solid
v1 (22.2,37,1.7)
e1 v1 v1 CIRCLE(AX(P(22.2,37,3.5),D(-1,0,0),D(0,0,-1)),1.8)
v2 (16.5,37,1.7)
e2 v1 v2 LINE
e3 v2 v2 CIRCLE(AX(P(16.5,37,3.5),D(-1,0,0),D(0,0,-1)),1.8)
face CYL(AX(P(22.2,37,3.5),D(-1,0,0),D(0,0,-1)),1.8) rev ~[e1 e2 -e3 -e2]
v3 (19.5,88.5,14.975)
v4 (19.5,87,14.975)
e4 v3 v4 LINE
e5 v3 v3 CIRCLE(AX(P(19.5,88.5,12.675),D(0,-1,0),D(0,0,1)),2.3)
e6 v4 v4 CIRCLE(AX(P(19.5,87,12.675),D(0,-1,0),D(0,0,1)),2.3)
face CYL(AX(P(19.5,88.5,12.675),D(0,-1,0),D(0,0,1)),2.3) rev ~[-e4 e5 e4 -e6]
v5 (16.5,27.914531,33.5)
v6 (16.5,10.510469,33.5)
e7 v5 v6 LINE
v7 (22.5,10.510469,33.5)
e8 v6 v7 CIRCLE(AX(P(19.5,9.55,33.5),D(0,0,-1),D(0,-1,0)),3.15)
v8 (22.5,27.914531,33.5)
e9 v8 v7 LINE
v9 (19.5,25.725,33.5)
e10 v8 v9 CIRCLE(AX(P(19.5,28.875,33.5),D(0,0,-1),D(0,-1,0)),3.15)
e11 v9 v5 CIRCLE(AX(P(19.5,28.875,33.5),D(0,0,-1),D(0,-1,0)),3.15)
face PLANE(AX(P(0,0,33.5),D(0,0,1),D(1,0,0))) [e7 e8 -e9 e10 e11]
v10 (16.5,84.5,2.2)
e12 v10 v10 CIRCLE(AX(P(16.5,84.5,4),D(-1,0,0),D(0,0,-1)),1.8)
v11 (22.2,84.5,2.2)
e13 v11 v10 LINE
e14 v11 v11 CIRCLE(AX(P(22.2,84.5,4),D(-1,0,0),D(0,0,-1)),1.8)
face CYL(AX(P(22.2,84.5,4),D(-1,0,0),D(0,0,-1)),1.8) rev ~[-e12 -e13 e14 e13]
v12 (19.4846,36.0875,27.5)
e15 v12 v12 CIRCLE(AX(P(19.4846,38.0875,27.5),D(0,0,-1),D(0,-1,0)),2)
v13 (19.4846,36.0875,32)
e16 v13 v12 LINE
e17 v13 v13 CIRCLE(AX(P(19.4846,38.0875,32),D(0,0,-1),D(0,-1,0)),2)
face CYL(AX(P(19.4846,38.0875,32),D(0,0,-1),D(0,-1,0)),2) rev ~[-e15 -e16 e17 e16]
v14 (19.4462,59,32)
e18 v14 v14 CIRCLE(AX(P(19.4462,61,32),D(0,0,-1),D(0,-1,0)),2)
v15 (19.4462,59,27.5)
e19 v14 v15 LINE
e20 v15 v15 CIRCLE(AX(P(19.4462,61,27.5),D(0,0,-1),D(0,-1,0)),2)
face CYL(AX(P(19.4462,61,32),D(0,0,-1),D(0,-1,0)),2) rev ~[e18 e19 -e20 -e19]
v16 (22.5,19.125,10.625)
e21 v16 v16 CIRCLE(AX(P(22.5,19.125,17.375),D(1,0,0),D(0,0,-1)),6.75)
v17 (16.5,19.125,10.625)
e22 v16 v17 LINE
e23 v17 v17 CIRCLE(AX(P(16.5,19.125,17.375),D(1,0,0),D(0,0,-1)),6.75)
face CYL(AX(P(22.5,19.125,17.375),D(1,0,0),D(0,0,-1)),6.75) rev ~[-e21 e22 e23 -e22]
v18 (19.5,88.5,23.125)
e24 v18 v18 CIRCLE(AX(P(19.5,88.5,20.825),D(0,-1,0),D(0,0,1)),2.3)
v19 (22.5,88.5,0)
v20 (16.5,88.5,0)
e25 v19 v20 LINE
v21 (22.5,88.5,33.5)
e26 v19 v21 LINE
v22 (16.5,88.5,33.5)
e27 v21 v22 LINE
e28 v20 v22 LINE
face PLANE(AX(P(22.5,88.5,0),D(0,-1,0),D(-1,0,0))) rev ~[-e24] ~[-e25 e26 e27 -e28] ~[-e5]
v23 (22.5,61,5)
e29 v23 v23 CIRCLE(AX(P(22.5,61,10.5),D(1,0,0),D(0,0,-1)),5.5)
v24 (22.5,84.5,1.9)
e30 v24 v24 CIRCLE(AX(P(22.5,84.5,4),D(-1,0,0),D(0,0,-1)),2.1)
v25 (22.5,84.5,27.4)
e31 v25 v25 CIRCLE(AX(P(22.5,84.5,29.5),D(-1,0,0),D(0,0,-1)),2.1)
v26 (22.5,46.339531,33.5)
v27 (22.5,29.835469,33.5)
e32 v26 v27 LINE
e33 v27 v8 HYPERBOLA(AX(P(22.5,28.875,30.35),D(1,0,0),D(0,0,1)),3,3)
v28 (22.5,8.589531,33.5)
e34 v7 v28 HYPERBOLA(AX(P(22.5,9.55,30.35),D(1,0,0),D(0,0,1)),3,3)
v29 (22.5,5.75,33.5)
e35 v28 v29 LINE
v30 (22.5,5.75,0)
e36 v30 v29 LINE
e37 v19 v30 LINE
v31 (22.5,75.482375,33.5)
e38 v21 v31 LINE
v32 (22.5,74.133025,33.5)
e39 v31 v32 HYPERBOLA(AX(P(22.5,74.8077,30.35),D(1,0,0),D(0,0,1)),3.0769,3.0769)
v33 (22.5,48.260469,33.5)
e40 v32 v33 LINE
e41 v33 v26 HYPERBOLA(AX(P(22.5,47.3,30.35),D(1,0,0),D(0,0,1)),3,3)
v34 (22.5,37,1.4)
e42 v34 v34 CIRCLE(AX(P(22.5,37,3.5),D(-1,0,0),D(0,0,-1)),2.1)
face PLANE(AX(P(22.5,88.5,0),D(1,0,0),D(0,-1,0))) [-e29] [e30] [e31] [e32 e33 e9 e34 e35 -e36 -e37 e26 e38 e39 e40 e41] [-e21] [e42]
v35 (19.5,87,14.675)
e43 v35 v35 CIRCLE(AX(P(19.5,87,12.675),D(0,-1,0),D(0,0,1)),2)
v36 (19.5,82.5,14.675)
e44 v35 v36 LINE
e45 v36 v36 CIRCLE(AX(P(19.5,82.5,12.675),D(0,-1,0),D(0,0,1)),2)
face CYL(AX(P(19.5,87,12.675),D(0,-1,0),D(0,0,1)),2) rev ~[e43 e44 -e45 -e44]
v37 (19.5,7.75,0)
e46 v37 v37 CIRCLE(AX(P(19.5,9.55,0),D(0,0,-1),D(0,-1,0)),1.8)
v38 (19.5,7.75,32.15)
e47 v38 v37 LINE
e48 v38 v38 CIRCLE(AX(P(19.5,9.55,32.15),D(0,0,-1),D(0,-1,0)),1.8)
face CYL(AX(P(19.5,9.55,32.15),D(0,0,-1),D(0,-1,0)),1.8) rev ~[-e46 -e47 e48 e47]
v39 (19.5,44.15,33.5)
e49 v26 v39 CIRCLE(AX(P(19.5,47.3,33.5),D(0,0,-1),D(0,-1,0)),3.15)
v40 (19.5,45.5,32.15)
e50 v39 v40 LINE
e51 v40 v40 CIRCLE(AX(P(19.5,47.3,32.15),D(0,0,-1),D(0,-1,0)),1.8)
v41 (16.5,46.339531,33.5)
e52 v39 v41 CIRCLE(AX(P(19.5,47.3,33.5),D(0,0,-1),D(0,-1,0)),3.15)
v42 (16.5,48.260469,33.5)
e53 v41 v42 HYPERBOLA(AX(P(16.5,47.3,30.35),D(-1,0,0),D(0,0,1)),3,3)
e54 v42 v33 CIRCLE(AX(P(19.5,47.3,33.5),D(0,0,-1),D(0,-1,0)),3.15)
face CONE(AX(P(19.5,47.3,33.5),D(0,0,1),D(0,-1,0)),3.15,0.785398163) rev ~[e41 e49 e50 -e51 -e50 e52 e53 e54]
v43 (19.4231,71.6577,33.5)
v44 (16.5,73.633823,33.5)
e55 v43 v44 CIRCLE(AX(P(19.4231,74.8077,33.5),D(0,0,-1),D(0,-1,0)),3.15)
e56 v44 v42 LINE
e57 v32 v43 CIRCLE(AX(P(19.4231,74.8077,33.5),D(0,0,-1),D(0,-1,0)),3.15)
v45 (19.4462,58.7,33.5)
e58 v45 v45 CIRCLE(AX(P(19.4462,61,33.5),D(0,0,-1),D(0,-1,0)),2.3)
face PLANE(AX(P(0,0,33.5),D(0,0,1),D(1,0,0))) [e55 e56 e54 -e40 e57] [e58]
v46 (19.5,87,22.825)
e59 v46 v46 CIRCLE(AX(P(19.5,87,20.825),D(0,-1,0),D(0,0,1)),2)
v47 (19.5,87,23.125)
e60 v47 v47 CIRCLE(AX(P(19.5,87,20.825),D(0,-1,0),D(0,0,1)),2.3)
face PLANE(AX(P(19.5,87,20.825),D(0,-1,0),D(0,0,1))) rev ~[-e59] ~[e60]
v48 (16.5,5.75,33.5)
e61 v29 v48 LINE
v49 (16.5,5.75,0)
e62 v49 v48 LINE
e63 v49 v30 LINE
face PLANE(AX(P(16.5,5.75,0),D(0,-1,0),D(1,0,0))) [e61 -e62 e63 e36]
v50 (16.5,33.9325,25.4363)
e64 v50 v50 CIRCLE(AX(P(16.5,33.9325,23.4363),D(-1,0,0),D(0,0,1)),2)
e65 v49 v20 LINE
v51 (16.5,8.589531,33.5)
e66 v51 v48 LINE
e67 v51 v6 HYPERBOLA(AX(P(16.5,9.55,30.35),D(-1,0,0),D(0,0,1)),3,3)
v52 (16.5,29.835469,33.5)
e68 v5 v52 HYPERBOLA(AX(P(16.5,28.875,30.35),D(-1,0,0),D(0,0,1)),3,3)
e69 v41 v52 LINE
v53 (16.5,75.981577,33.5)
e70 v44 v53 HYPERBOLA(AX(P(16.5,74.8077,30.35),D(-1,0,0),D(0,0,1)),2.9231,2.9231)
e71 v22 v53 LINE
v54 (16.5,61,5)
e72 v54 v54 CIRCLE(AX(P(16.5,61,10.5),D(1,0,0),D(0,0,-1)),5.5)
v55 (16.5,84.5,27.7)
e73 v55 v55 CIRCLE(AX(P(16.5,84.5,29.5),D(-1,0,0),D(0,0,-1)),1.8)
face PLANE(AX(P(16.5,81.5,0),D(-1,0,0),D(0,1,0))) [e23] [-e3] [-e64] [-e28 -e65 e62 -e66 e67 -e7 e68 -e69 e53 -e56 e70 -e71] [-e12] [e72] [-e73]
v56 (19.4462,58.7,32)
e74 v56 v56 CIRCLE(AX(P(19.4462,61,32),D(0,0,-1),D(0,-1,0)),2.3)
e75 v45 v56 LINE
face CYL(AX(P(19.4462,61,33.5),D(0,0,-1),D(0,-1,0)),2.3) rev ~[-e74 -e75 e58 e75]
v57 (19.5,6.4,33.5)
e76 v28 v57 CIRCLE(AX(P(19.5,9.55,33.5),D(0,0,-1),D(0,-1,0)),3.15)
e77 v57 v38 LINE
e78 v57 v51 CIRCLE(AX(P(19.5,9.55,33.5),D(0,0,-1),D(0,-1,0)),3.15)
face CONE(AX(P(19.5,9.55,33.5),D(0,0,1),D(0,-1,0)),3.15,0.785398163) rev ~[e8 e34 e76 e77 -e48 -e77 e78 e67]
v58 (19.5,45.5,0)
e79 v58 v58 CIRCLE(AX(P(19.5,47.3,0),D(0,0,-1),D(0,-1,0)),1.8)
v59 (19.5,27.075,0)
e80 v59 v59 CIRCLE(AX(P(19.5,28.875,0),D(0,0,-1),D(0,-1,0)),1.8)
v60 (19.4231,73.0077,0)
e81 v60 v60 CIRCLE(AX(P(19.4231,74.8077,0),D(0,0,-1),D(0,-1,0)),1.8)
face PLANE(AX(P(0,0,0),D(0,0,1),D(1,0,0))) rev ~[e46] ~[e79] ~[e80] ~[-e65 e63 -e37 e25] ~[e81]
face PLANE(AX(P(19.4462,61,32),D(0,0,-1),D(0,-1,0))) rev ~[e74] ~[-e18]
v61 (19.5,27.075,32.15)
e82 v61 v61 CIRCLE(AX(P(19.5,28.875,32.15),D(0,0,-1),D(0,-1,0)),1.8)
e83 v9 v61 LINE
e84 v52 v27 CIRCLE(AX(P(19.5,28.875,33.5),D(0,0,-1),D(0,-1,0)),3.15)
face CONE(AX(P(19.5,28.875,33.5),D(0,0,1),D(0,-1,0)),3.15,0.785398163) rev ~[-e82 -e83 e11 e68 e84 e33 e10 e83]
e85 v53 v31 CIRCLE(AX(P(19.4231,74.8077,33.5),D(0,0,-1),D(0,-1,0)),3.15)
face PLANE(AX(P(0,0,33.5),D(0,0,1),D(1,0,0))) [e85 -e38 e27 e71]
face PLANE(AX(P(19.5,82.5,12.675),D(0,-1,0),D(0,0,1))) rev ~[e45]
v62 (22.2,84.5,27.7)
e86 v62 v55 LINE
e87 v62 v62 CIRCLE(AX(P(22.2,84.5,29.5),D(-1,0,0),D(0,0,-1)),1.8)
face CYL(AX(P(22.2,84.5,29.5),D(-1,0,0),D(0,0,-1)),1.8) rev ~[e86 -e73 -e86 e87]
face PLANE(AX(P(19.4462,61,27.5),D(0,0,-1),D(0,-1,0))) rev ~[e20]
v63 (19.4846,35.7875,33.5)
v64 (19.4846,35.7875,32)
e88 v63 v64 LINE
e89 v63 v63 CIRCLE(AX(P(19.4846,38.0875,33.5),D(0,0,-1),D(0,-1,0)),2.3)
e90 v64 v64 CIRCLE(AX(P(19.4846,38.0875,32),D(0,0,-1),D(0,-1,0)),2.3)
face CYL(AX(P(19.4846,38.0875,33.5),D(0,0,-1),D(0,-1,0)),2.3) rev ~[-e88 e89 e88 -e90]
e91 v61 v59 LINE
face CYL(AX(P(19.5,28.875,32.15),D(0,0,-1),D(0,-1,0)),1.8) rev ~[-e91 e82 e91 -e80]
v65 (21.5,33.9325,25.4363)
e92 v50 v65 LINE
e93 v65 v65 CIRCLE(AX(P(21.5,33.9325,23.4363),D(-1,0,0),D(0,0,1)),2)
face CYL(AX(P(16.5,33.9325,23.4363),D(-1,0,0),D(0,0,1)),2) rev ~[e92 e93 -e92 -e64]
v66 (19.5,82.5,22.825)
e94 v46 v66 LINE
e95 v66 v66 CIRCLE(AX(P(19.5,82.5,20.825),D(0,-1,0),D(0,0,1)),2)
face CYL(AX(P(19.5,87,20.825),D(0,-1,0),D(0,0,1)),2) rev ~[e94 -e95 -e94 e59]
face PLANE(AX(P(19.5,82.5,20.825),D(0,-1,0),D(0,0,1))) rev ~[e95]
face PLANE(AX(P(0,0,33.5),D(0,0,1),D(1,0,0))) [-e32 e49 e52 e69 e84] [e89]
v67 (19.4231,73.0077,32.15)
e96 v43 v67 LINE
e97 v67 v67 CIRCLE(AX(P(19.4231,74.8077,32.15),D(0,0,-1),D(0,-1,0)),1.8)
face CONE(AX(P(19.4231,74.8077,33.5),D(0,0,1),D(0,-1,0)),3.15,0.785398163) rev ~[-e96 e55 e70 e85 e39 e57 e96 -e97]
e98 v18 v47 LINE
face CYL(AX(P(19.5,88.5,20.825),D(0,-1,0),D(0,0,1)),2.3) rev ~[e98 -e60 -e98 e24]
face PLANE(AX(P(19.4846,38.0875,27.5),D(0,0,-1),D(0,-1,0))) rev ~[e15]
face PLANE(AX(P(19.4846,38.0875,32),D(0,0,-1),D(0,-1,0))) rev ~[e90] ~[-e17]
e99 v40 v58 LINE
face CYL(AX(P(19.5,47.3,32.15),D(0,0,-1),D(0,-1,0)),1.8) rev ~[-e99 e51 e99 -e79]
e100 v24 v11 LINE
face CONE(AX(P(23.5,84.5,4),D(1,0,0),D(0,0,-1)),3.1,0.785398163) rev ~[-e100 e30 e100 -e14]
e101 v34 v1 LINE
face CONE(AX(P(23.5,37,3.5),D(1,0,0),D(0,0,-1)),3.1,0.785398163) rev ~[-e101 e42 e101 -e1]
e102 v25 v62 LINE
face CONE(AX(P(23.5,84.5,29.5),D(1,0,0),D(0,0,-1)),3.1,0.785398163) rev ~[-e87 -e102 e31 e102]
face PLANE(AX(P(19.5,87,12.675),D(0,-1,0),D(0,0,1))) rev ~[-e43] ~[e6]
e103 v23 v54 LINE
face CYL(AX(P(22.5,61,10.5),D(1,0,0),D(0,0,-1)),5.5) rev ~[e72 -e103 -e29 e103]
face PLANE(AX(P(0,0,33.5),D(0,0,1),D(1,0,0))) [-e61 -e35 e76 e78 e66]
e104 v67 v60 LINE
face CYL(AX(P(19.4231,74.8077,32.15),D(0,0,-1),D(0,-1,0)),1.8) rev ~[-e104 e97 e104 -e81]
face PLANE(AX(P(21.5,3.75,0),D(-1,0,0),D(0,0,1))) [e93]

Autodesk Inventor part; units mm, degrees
ref_plane "YZ Plane" through (0, 0, 0) normal (1, 0, 0) x (0, 1, 0)
ref_plane "XZ Plane" through (0, 0, 0) normal (0, 1, 0) x (-1, 0, 0)
ref_plane "Work Plane1" through (0, 0, 0) normal (0, 0, 1) x (1, 0, 0)
sketch "Sketch1" plane through (0, 0, 0) normal (0, 0, 1) x (1, 0, 0)
  line L0 (23.5, 88.5) -> (-23.5, 88.5) projected
  line L1 (-23.5, 88.5) -> (-23.5, 36.5) projected
  line L2 (-26.5, 33.5) -> (-89, 33.5) projected
  line L3 (-89, 33.5) -> (-89, -72.5) projected
  line L4 (-89, -72.5) -> (-77, -72.5) projected
  line L5 (-74, -75.5) -> (-74, -93.5) projected
  line L6 (-74, -93.5) -> (74, -93.5) projected
  line L7 (74, -93.5) -> (74, -75.5) projected
  line L8 (77, -72.5) -> (89, -72.5) projected
  line L9 (89, -72.5) -> (89, 33.5) projected
  line L10 (89, 33.5) -> (26.5, 33.5) projected
  line L11 (23.5, 36.5) -> (23.5, 88.5) projected
  line L12 (-4.5, 81.5) -> (-4.5, 36.5) projected
  line L13 (-7.5, 33.5) -> (-13.5, 33.5) projected
  line L14 (-16.5, 36.5) -> (-16.5, 81.5) projected
  line L15 (7.5, 84.5) -> (13.5, 84.5) projected
  line L16 (16.5, 81.5) -> (16.5, 36.5) projected
  line L17 (13.5, 33.5) -> (7.5, 33.5) projected
  line L18 (4.5, 36.5) -> (4.5, 81.5) projected
  line L19 (-13.5, 84.5) -> (-7.5, 84.5) projected
  line L20 (16.5, 88.5) -> (22.5, 88.5)
  line L21 (22.5, 88.5) -> (22.5, 3.75)
  line L22 (22.5, 3.75) -> (16.5, 3.75)
  line L23 (16.5, 3.75) -> (16.5, 88.5)
  line L24 (59.9, 4.75) -> (32.2, 4.75)
  arc A0 (13.5, 33.5) -> (16.5, 36.5) centre (13.5, 36.5) ccw projected
  arc A1 (4.5, 36.5) -> (7.5, 33.5) centre (7.5, 36.5) ccw projected
  arc A2 (7.5, 84.5) -> (4.5, 81.5) centre (7.5, 81.5) ccw projected
  arc A3 (16.5, 81.5) -> (13.5, 84.5) centre (13.5, 81.5) ccw projected
  arc A4 (-4.5, 81.5) -> (-7.5, 84.5) centre (-7.5, 81.5) ccw projected
  arc A5 (-7.5, 33.5) -> (-4.5, 36.5) centre (-7.5, 36.5) ccw projected
  arc A6 (-16.5, 36.5) -> (-13.5, 33.5) centre (-13.5, 36.5) ccw projected
  arc A7 (-13.5, 84.5) -> (-16.5, 81.5) centre (-13.5, 81.5) ccw projected
  arc A8 (-26.5, 33.5) -> (-23.5, 36.5) centre (-26.5, 36.5) ccw projected
  arc A9 (-74, -75.5) -> (-77, -72.5) centre (-77, -75.5) ccw projected
  arc A10 (77, -72.5) -> (74, -75.5) centre (77, -75.5) ccw projected
  arc A11 (23.5, 36.5) -> (26.5, 33.5) centre (26.5, 36.5) ccw projected
  circle A12 centre (21.5, -85.5) radius 1.8 projected
  circle A13 centre (-64.5, -85.5) radius 1.8 projected
  circle A14 centre (83.4, -16.3889) radius 1.8 projected
  circle A15 centre (-83.4, -19.2889) radius 1.8 projected
  circle A16 centre (-21.5, -85.5) radius 1.8 projected
  circle A17 centre (64.5, -85.5) radius 1.8 projected
  circle A18 centre (-56.0375, 15.0937) radius 1.0065 projected
  circle A19 centre (39.125, 4.3375) radius 1.0065 projected
  circle A20 centre (-72.95, 4.275) radius 1.0065 projected
  circle A21 centre (39.125, 25.9125) radius 1.0065 projected
  circle A22 centre (72.95, 12.275) radius 1.0065 projected
  circle A23 centre (86, 30.5) radius 1.0065 projected
  circle A24 centre (-86, 30.5) radius 1.0065 projected
  circle A25 centre (-39.125, 12.3375) radius 1.0065 projected
  circle A26 centre (-72.95, 25.975) radius 1.0065 projected
  circle A27 centre (-72.95, 12.275) radius 1.0065 projected
  circle A28 centre (-39.125, 25.9125) radius 1.0065 projected
  circle A29 centre (-86, 7.75) radius 1.0065 projected
  circle A30 centre (86, 7.75) radius 1.0065 projected
  circle A31 centre (72.95, 25.975) radius 1.0065 projected
  circle A32 centre (39.125, 12.3375) radius 1.0065 projected
  circle A33 centre (-39.125, 4.3375) radius 1.0065 projected
  circle A34 centre (72.95, 4.275) radius 1.0065 projected
  circle A35 centre (56.0375, 15.125) radius 1.0065 projected
  circle A36 centre (78, -67.1725) radius 1.2295 projected
  circle A37 centre (-24.1, -73.1) radius 1.2295 projected
  circle A38 centre (24.1, -24.9) radius 1.2295 projected
  circle A39 centre (-42.4984, -44.6666) radius 1.2295 projected
  circle A40 centre (-79, -42.3889) radius 1.2295 projected
  circle A41 centre (-19.5, 28.875) radius 1.2295 projected
  circle A42 centre (19.5, 9.55) radius 1.2295 projected
  circle A43 centre (19.5, 47.3) radius 1.2295 projected
  circle A44 centre (-19.5, 47.3) radius 1.2295 projected
  circle A45 centre (0, 74.7) radius 1.2295 projected
  circle A46 centre (-19.4231, 74.8077) radius 1.2295 projected
  circle A47 centre (19.5, 74.7) radius 1.2295 projected
  circle A48 centre (0, 49.05) radius 1.2295 projected
  circle A49 centre (19.5, 28.875) radius 1.2295 projected
  circle A50 centre (0, 19.125) radius 1.2295 projected
  circle A51 centre (-19.5, 9.55) radius 1.2295 projected
  circle A52 centre (-78, -67.1725) radius 1.2295 projected
  circle A53 centre (-24.1, -24.9) radius 1.2295 projected
  circle A54 centre (24.1, -73.1) radius 1.2295 projected
  circle A55 centre (42.5, -44.6649) radius 1.2295 projected
  circle A56 centre (79, -42.3889) radius 1.2295 projected
  point P0 (0, 0)
  point P1 (7.5, 81.5)
  point P2 (13.5, 81.5)
  point P3 (-7.5, 81.5)
  point P4 (-13.5, 81.5)
  dimension "d0" = 1
  dimension "d1" = 1
ref_plane "Work Plane2" through (-89, -40.3889, 33.5) normal (0, 0, 1) x (1, 0, 0)
extrude "Extrusion1" add sketch "Sketch1" along normal up to surface (33.5 mm away) contours L21 L22 L23 L16 L0 | A42 | A43 | A47 | A49
sketch "Sketch2" plane through (22.5, 3.75, 0) normal (1, 0, 0) x (0, 0, -1)
  circle A0 centre (-17.375, 15.375) radius 6.75 projected
  circle A1 centre (-10.5, 57.25) radius 5.5 projected
  point P0 (0, -3.75)
  dimension "d8" = 11
extrude "Extrusion2" cut sketch "Sketch2" against normal up to next
sketch "Sketch3" plane through (16.5, 3.75, 0) normal (-1, 0, 0) x (0, 0, 1)
  circle A0 centre (23.4363, 30.1825) radius 2 projected
  point P0 (0, -3.75)
extrude "Extrusion3" cut sketch "Sketch3" against normal blind 5
ref_plane "Work Plane3" through (23.5, 3.75, 0) normal (1, 0, 0) x (0, 0, -1)
sketch "Sketch4" plane through (23.5, 3.75, 0) normal (1, 0, 0) x (0, 0, -1)
  circle A0 centre (-29.5, 80.75) radius 1.8 projected
  circle A1 centre (-3.5, 33.25) radius 1.8 projected
  circle A2 centre (-4, 80.75) radius 1.8 projected
  point P0 (0, -3.75)
hole "Hole1" at (23.5, 37, 3.5) at (23.5, 84.5, 4) at (23.5, 84.5, 29.5) direction (-1, 0, 0) diameter 3.6 end through all countersink diameter 6.2 countersink angle 90 clearance for "Countersunk Flat Head Screw ISO 2009/7046" size "M3" standard "ISO"
sketch "Sketch5" plane through (16.5, 3.75, 33.5) normal (0, 0, 1) x (1, 0, 0)
  circle A0 centre (-36, 5.8) radius 1.8 projected
  circle A1 centre (-36, 25.125) radius 1.8 projected
  circle A2 centre (-36, 43.55) radius 1.8 projected
  circle A3 centre (-35.9231, 71.0577) radius 1.8 projected
  circle A4 centre (-16.5, 45.3) radius 3.3 projected
  circle A5 centre (-16.5, 15.375) radius 3.3 projected
  circle A6 centre (-16.5, 70.95) radius 3.3 projected
  line L0 (-12, 2) -> (-21, 2) projected
  line L1 (-12, 84.75) -> (-12, 2) projected
  line L2 (-21, 84.75) -> (-12, 84.75) projected
  line L3 (-21, 2) -> (-21, 84.75) projected
  line L4 (-16.5, 2) -> (-16.5, 84.75)
  circle A7 centre (3, 5.8) radius 1.8
  circle A8 centre (3, 25.125) radius 1.8
  circle A9 centre (3, 43.55) radius 1.8
  circle A10 centre (2.9231, 71.0577) radius 1.8
  circle A11 centre (-16.5, 30.7161) radius 2.3 projected
  circle A12 centre (-16.5, 59.25) radius 2.3 projected
  point P0 (-16.5, -3.75)
hole "Hole2" at (19.5, 9.55, 33.5) at (19.5, 28.875, 33.5) at (19.5, 47.3, 33.5) at (19.4231, 74.8077, 33.5) direction (0, 0, -1) diameter 3.6 end through all countersink diameter 6.3 countersink angle 90 clearance for "Countersunk Flat Head Screw ISO 2009/7046" size "M3" standard "ISO"
sketch "Sketch7" plane through (16.5, 88.5, 0) normal (0, 1, 0) x (1, 0, 0)
  line L0 (0, -33.5) -> (6, -33.5) projected
  line L1 (6, 0) -> (6, -33.5) projected
  line L2 (6, 0) -> (0, 0) projected
  line L3 (0, 0) -> (0, -33.5) projected
  circle A0 centre (-16.5, -12.675) radius 2 projected
  circle A1 centre (-16.5, -20.825) radius 2 projected
  line L4 (-16.5, -20.825) -> (6, -20.825)
  line L5 (-16.5, -12.675) -> (6, -12.675)
  line L6 (6, -5) -> (6, -16) projected
  point P0 (-16.5, 0)
  point P1 (3, -20.825)
  point P2 (3, -12.675)
hole "Hole4" at (19.5, 88.5, 20.825) at (19.5, 88.5, 12.675) direction (0, -1, 0) diameter 4 depth 6 counterbore diameter 4.6 counterbore depth 1.5
sketch "Sketch8" plane through (19.5, 47.3, 33.5) normal (0, 0, 1) x (1, 0, 0)
  circle A0 centre (-39, -9.2125) radius 2.3 projected
  circle A1 centre (-39, 13.7) radius 2.3 projected
  arc A2 (3, 0.9605) -> (-3, 0.9605) centre (0, 0) ccw projected
  line L0 (3, 26.8331) -> (3, 0.9605) projected
  arc A3 (-3, 26.3338) -> (3, 26.8331) centre (-0.0769, 27.5077) ccw projected
  line L1 (-3, 0.9605) -> (-3, 26.3338) projected
  arc A4 (-3, -0.9605) -> (3, -0.9605) centre (0, 0) ccw projected
  line L2 (-3, -17.4645) -> (-3, -0.9605) projected
  arc A5 (3, -17.4645) -> (-3, -17.4645) centre (0, -18.425) ccw projected
  line L3 (3, -0.9605) -> (3, -17.4645) projected
  line L4 (-39, 13.7) -> (3, 13.7)
  line L5 (3, 19.2) -> (3, 8.2) projected
  line L6 (-39, -9.2125) -> (3, -9.2125)
  circle A6 centre (0, -18.425) radius 1.8 projected
  line L7 (0, -18.425) -> (-0.0769, 27.5077)
  point P0 (-19.5, -47.3)
  point P1 (-0.0538, 13.7)
  point P2 (-0.0154, -9.2125)
hole "Hole5" at (19.4462, 61, 33.5) at (19.4846, 38.0875, 33.5) direction (0, 0, -1) diameter 4 depth 6 counterbore diameter 4.6 counterbore depth 1.5
sketch "Sketch9" plane through (16.5, 3.75, 0) normal (0, -1, 0) x (1, 0, 0)
  line L0 (0, 0) -> (0, 33.5) projected
  line L1 (0, 0) -> (6, 0) projected
  line L2 (6, 0) -> (6, 33.5) projected
  line L3 (6, 33.5) -> (0, 33.5) projected
  point P0 (-16.5, 0)
extrude "Extrusion4" cut sketch "Sketch9" against normal blind 2
properties part number "left_gear_holder" material "Nylon 6/6"
